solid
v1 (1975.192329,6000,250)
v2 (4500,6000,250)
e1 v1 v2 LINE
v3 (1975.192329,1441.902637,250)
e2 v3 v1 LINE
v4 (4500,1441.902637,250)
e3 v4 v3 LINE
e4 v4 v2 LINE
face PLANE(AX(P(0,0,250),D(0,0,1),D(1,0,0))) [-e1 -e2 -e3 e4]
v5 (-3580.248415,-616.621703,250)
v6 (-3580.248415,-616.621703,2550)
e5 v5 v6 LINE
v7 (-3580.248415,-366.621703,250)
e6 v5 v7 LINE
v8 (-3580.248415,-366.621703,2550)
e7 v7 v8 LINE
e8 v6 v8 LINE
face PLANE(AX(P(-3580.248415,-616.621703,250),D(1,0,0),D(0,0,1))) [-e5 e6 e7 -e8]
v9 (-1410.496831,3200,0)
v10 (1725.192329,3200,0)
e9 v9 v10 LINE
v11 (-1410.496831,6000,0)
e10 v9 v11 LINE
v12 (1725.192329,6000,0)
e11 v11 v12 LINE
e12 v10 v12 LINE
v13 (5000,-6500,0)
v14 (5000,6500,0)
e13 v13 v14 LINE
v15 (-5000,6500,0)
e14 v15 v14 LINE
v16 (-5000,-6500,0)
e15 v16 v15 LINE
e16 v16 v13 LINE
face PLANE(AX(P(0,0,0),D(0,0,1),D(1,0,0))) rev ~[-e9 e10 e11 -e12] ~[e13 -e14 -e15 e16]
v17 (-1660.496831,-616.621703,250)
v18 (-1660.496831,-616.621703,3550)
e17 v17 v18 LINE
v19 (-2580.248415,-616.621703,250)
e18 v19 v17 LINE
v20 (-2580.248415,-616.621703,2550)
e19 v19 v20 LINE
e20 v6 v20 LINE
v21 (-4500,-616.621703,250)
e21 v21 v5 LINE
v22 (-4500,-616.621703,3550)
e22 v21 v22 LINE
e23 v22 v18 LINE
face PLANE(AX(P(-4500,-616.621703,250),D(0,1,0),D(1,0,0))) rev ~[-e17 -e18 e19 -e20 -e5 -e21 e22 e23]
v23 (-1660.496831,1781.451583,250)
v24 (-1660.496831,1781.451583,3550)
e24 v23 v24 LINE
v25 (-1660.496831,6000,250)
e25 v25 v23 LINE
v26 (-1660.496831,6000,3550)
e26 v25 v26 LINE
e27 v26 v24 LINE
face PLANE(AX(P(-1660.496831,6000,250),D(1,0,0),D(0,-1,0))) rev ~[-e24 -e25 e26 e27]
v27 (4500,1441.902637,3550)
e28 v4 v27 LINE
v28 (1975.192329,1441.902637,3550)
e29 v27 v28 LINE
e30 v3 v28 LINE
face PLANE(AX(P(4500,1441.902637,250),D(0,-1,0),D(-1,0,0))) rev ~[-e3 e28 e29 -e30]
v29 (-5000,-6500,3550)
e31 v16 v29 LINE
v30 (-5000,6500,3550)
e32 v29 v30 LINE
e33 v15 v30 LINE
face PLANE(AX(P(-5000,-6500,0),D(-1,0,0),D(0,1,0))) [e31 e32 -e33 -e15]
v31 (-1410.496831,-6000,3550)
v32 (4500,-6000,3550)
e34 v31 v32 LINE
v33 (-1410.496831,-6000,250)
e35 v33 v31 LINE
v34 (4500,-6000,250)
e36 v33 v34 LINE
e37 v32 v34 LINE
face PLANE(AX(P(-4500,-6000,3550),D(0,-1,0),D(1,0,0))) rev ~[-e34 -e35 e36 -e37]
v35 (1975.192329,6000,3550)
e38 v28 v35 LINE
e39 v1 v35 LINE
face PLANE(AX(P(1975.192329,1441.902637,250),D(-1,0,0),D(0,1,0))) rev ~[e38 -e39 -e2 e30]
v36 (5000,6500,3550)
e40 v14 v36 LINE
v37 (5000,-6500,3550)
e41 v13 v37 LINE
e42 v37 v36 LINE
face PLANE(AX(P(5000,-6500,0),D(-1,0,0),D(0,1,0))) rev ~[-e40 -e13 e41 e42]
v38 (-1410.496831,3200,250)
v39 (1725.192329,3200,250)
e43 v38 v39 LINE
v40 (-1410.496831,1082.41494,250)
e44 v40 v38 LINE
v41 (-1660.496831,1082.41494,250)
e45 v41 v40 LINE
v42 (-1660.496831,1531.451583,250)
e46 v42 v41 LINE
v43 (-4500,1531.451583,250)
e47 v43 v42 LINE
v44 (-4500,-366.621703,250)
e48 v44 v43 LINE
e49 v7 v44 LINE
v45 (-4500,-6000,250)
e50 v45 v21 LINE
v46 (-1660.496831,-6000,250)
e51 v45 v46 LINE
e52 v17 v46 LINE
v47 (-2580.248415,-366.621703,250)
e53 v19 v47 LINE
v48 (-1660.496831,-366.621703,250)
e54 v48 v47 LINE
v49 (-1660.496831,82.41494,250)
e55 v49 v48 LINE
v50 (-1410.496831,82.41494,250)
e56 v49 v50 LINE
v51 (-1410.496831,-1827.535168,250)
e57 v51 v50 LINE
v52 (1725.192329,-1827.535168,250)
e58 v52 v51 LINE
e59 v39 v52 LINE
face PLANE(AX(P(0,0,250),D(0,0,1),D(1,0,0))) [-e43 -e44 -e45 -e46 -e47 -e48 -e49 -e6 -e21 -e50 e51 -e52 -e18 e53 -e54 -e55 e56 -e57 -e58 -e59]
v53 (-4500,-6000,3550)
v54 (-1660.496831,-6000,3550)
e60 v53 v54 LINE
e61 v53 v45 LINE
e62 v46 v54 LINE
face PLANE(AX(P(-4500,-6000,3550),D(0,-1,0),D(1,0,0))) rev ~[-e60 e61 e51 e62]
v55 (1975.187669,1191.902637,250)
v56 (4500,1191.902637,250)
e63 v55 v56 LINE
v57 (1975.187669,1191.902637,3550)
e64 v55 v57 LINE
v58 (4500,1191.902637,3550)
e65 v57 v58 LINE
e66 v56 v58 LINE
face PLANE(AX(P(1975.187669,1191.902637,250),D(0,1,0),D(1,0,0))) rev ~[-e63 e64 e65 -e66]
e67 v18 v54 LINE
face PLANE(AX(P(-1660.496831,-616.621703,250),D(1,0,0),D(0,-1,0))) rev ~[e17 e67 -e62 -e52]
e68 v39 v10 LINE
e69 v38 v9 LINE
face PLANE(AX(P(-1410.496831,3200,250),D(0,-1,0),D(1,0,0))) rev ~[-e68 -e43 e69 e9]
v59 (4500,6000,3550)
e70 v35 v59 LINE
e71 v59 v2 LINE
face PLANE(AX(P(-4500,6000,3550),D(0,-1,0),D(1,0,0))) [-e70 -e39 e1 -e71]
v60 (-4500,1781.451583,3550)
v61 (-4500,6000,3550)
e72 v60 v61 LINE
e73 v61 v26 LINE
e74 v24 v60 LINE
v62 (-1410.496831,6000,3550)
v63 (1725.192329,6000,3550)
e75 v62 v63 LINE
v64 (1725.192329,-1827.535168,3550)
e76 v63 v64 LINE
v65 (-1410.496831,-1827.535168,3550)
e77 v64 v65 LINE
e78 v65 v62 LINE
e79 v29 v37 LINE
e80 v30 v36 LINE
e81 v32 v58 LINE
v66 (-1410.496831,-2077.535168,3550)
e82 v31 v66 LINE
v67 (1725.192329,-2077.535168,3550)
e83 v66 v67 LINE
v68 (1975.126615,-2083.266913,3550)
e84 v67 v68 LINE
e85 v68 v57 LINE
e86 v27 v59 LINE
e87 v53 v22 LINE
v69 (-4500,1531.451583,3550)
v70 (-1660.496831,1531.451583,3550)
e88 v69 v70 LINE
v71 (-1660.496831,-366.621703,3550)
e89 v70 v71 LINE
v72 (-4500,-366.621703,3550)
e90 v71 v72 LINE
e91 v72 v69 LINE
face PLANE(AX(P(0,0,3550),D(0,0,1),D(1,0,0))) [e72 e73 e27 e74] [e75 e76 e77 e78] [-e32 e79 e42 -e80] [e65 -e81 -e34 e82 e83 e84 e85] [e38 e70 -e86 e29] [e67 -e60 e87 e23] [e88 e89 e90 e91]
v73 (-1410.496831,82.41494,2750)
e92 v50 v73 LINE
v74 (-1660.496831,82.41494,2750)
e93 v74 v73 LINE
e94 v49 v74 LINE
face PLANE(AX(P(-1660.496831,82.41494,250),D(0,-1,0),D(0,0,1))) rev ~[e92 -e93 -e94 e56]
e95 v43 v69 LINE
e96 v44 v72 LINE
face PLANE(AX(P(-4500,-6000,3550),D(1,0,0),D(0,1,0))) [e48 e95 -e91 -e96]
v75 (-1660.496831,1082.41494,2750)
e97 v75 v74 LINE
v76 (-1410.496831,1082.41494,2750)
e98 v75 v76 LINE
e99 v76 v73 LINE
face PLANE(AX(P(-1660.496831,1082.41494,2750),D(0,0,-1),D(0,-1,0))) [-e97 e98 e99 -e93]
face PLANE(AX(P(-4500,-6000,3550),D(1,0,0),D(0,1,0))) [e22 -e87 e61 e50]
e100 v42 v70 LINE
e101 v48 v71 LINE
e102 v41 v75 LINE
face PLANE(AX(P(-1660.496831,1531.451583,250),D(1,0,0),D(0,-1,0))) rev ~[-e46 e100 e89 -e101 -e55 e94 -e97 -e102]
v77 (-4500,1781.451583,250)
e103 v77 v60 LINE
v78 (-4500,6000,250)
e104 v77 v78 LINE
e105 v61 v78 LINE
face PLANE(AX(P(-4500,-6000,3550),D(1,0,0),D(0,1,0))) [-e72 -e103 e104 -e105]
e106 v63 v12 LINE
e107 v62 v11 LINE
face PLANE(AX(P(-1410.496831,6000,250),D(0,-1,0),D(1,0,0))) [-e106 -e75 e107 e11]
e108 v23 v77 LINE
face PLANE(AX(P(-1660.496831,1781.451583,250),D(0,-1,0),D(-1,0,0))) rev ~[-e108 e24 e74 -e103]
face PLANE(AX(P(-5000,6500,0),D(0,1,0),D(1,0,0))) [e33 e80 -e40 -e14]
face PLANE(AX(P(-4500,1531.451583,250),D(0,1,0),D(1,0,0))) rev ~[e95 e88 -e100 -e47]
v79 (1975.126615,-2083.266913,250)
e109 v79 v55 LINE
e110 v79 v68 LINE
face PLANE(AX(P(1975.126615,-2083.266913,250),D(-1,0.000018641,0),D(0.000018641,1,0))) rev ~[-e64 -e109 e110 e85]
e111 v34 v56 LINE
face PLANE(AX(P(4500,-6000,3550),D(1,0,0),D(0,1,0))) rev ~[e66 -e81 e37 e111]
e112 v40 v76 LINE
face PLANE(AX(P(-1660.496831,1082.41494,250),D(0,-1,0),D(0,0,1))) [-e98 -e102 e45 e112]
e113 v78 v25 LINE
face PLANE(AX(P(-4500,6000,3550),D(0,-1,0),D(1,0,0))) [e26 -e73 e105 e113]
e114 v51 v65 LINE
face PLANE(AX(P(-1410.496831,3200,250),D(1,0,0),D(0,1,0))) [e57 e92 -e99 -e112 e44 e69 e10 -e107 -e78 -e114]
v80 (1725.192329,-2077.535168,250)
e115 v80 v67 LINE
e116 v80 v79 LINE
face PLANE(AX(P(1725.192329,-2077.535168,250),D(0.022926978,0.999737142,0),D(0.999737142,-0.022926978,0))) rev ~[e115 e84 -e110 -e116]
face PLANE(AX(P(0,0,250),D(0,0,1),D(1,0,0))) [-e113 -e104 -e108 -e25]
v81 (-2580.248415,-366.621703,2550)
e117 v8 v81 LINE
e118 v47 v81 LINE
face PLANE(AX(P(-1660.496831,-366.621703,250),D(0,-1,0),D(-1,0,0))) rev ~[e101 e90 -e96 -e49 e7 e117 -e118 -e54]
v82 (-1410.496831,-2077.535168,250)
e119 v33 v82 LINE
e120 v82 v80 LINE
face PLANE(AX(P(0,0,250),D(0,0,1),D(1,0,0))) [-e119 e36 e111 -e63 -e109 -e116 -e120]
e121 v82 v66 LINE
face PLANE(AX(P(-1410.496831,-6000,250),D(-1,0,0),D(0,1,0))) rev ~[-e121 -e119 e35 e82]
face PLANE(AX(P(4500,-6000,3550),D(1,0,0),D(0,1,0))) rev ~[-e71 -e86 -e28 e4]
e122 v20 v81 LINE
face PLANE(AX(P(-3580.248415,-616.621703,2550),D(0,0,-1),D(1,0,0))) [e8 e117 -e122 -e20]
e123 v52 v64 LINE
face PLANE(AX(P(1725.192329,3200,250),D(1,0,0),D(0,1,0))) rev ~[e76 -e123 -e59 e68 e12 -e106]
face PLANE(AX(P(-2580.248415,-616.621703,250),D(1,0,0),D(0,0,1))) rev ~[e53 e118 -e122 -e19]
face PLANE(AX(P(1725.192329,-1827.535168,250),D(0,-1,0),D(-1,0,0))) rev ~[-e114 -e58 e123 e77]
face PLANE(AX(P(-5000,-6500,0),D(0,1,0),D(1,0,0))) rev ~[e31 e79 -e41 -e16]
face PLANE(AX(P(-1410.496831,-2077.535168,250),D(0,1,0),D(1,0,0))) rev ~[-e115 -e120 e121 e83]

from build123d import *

# Parameters (mm, degrees)
F0_W      = 10000
F0_H      = 13000
F1_DEPTH  = 3550
F2_W      = 9000
F2_H      = 12000
F3_DEPTH  = 3300
F5_DEPTH  = 3300
F6_W      = 1000
F6_H      = 2300
F7_DEPTH  = 250
F8_W      = 1000
F8_H      = 2500
F9_DEPTH  = 250
F10_W     = 3135.6891602224
F10_H     = 2800
F11_DEPTH = 250


# Not quite as in the source:
# - a feature names something its author has since deleted; it is built from what else it names


with BuildPart() as f1:
    # F0 (on Top) → F1 (new body)
    with BuildSketch(Plane.XY):
        Rectangle(F0_W, F0_H)
    extrude(amount=F1_DEPTH)

    # F2 (on face) → F3 (cut)
    with BuildSketch(Plane.XY.offset(3550)):
        Rectangle(F2_W, F2_H)
    extrude(amount=-F3_DEPTH, mode=Mode.SUBTRACT)

    # F4 (on face) → F5 (join)
    with BuildSketch(Plane.XY.offset(250)):
        Polygon((-1660.4968309402, -366.6217029095), (-4500, -366.6217029095), (-4500, -616.6217029095), (-1660.4968309402, -616.6217029095), (-1660.4968309402, -6000), (-1410.4968309402, -6000), (-1410.4968309402, -2077.5351682588), (1725.1923292822, -2077.5351682588), (1975.1266148544, -2083.2669128011), (1975.1876689086, 1191.9026374817), (4500, 1191.9026374817), (4500, 1441.9026374817), (1975.1923292822, 1441.9026374817), (1975.1923292822, 6000), (1725.1923292822, 6000), (1725.1923292822, 1441.9026374817), (1725.1923292822, -1827.5351682588), (-1410.4968309402, -1827.5351682588), (-1410.4968309402, 6000), (-1660.4968309402, 6000), (-1660.4968309402, 1781.4515829086), (-4500, 1781.4515829086), (-4500, 1531.4515829086), (-1660.4968309402, 1531.4515829086), align=None)
    extrude(amount=F5_DEPTH)

    # F6 (on face) → F7 (cut)
    with BuildSketch(Plane.XZ.offset(616.6217029095)):
        with Locations((-3080.2484154701, 1400)):
            Rectangle(F6_W, F6_H)
    extrude(amount=-F7_DEPTH, mode=Mode.SUBTRACT)

    # F8 (on face) → F9 (cut, through all)
    with BuildSketch(Plane(origin=(-1660.4968309402, 0, 0), x_dir=(0, -1, 0), z_dir=(-1, 0, 0))):
        with Locations((-582.4149399996, 1500)):
            Rectangle(F8_W, F8_H)
    extrude(amount=-F9_DEPTH, mode=Mode.SUBTRACT)

    # F10 (on face) → F11 (cut, through all)
    with BuildSketch(Plane.XY.offset(250)):
        with Locations((157.347749171, 4600)):
            Rectangle(F10_W, F10_H)
    extrude(amount=-F11_DEPTH, mode=Mode.SUBTRACT)


solid = f1.part
